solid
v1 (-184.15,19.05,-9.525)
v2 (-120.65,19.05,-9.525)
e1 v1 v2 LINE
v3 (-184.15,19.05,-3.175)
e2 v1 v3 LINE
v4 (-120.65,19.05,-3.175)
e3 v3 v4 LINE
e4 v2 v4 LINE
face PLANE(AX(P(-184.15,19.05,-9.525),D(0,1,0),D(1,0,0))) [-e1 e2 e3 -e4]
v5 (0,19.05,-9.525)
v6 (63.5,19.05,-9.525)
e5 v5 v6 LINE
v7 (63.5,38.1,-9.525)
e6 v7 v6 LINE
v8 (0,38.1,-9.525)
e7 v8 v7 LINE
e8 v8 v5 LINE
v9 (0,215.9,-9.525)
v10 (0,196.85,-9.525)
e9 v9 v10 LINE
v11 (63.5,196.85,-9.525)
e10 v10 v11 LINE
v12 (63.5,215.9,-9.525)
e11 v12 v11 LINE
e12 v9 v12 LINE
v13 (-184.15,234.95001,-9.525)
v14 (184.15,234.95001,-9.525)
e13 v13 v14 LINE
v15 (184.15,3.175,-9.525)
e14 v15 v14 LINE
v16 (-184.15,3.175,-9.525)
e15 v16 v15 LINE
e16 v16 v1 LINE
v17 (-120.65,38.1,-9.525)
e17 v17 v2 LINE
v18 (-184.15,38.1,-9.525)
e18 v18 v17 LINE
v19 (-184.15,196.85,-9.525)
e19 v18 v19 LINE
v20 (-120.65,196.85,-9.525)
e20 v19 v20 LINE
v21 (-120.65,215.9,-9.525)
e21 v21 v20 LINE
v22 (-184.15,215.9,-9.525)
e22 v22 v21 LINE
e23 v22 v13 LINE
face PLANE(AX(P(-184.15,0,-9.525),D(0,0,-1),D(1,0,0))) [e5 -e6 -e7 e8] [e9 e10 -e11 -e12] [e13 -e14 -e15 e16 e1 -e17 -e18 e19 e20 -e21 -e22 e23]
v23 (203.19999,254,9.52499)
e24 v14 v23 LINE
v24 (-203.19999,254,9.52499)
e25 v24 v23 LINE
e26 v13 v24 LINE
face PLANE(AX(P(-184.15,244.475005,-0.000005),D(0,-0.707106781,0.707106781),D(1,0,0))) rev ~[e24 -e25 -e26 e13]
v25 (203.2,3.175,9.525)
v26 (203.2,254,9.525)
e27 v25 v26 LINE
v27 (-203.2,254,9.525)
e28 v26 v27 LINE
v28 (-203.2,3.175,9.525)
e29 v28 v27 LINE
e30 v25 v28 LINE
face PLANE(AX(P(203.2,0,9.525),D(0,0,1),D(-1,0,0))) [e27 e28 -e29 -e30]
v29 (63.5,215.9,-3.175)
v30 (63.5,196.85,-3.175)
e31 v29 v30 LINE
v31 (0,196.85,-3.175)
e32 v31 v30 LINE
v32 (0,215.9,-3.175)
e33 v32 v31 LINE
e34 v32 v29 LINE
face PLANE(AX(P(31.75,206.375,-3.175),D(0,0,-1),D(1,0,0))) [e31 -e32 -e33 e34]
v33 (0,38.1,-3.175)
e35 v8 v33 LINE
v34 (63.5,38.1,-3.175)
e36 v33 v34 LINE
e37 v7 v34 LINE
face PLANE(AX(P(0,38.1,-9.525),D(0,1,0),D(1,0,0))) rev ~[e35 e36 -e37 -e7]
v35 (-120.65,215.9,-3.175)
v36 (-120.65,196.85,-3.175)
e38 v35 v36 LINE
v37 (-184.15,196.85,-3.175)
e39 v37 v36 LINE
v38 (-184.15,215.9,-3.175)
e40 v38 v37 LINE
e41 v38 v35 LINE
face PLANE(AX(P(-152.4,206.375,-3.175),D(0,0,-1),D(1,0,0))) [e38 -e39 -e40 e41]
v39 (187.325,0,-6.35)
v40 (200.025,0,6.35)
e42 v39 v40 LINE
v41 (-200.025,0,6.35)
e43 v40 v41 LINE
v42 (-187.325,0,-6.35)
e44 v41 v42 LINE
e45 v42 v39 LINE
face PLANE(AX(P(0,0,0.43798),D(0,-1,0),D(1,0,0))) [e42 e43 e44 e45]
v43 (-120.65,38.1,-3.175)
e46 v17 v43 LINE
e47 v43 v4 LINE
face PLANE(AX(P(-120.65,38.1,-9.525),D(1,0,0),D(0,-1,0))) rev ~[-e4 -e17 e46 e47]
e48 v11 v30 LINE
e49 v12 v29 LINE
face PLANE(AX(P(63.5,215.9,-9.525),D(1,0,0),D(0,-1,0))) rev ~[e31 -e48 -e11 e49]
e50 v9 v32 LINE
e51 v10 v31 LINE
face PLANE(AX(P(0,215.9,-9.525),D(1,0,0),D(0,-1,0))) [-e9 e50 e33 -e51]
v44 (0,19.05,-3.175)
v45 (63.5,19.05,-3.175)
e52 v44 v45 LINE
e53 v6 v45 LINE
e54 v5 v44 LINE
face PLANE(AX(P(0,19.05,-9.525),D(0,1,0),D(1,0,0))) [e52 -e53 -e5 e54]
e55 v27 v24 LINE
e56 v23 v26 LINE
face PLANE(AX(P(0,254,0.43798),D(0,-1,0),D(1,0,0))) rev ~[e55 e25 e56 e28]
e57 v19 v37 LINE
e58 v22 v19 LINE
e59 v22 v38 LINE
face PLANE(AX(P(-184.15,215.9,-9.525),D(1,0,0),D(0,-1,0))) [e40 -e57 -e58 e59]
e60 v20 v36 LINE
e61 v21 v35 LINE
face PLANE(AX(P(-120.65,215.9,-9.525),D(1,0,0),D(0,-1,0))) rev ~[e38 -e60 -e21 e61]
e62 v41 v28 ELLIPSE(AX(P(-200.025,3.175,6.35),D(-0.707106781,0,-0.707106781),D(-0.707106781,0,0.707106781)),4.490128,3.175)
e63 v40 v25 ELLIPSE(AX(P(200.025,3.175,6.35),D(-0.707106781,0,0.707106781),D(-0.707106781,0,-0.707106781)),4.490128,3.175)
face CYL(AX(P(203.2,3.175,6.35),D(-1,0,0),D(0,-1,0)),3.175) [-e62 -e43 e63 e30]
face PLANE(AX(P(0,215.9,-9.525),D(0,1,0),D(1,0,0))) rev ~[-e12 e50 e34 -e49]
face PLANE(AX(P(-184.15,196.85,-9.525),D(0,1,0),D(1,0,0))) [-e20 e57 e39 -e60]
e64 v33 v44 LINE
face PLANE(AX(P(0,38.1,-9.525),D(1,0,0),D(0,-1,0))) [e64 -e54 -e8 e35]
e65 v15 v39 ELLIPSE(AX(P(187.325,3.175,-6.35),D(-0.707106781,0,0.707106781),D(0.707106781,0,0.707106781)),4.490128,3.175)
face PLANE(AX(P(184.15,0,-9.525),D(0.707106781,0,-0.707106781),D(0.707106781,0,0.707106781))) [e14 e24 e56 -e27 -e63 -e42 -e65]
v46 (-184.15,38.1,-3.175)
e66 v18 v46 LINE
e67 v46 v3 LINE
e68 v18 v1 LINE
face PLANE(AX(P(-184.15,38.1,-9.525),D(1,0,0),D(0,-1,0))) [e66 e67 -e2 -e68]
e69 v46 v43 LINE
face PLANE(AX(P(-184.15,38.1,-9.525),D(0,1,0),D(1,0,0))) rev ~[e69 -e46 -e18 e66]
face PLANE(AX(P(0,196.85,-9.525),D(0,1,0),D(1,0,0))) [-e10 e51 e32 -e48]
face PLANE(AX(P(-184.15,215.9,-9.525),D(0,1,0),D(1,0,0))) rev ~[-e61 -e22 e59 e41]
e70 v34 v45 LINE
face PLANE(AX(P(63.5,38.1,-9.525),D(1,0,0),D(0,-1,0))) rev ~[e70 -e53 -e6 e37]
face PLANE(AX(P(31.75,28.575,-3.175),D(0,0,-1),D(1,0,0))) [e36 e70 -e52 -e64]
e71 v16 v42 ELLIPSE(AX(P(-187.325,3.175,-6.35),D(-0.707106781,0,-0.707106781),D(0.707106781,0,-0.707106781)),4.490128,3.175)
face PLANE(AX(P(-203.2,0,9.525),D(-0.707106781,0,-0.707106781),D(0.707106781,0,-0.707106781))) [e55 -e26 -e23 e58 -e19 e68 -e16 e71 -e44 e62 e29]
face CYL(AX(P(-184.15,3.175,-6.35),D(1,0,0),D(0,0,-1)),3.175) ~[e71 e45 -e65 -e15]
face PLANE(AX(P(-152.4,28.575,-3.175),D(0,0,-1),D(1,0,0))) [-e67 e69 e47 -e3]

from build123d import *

# Parameters (mm, degrees)
F1_DEPTH = 254
F2_SIZE  = 19.04999
F3_W     = 63.5
F3_H     = 19.05
F4_DEPTH = 6.35
F5_R     = 3.175


# Not quite as in the source:
# - a fillet or chamfer is up to 0.001 mm smaller than in the source, because OpenCascade refuses the exact size


with BuildPart() as f1:
    # F0 (on Front) → F1 (new body)
    with BuildSketch(Plane.XZ):
        Polygon((203.2, 9.525), (-203.2, 9.525), (-184.15, -9.525), (184.15, -9.525), align=None)
    extrude(amount=-F1_DEPTH)

    # F2 (size 19.05 in the source; OpenCascade refuses exactly that, so slightly less here)
    f2_edges = [f1.edges().sort_by_distance(p)[0] for p in [
        (0, 254, -9.525),
    ]]
    chamfer(f2_edges, length=F2_SIZE)

    # F3 (on face) → F4 (cut)
    with BuildSketch(Plane(origin=(0, 0, -9.525), x_dir=(1, 0, 0), z_dir=(0, 0, -1))):
        with Locations((-152.4, -28.575)):
            Rectangle(F3_W, F3_H)
        with Locations((31.75, -28.575)):
            Rectangle(F3_W, F3_H)
        with Locations((31.75, -206.375)):
            Rectangle(F3_W, F3_H)
        with Locations((-152.4, -206.375)):
            Rectangle(F3_W, F3_H)
    extrude(amount=-F4_DEPTH, mode=Mode.SUBTRACT)

    # F5
    f5_edges = [f1.edges().sort_by_distance(p)[0] for p in [
        (0, 0, 9.525),
        (0, 0, -9.525),
    ]]
    fillet(f5_edges, radius=F5_R)


solid = f1.part
